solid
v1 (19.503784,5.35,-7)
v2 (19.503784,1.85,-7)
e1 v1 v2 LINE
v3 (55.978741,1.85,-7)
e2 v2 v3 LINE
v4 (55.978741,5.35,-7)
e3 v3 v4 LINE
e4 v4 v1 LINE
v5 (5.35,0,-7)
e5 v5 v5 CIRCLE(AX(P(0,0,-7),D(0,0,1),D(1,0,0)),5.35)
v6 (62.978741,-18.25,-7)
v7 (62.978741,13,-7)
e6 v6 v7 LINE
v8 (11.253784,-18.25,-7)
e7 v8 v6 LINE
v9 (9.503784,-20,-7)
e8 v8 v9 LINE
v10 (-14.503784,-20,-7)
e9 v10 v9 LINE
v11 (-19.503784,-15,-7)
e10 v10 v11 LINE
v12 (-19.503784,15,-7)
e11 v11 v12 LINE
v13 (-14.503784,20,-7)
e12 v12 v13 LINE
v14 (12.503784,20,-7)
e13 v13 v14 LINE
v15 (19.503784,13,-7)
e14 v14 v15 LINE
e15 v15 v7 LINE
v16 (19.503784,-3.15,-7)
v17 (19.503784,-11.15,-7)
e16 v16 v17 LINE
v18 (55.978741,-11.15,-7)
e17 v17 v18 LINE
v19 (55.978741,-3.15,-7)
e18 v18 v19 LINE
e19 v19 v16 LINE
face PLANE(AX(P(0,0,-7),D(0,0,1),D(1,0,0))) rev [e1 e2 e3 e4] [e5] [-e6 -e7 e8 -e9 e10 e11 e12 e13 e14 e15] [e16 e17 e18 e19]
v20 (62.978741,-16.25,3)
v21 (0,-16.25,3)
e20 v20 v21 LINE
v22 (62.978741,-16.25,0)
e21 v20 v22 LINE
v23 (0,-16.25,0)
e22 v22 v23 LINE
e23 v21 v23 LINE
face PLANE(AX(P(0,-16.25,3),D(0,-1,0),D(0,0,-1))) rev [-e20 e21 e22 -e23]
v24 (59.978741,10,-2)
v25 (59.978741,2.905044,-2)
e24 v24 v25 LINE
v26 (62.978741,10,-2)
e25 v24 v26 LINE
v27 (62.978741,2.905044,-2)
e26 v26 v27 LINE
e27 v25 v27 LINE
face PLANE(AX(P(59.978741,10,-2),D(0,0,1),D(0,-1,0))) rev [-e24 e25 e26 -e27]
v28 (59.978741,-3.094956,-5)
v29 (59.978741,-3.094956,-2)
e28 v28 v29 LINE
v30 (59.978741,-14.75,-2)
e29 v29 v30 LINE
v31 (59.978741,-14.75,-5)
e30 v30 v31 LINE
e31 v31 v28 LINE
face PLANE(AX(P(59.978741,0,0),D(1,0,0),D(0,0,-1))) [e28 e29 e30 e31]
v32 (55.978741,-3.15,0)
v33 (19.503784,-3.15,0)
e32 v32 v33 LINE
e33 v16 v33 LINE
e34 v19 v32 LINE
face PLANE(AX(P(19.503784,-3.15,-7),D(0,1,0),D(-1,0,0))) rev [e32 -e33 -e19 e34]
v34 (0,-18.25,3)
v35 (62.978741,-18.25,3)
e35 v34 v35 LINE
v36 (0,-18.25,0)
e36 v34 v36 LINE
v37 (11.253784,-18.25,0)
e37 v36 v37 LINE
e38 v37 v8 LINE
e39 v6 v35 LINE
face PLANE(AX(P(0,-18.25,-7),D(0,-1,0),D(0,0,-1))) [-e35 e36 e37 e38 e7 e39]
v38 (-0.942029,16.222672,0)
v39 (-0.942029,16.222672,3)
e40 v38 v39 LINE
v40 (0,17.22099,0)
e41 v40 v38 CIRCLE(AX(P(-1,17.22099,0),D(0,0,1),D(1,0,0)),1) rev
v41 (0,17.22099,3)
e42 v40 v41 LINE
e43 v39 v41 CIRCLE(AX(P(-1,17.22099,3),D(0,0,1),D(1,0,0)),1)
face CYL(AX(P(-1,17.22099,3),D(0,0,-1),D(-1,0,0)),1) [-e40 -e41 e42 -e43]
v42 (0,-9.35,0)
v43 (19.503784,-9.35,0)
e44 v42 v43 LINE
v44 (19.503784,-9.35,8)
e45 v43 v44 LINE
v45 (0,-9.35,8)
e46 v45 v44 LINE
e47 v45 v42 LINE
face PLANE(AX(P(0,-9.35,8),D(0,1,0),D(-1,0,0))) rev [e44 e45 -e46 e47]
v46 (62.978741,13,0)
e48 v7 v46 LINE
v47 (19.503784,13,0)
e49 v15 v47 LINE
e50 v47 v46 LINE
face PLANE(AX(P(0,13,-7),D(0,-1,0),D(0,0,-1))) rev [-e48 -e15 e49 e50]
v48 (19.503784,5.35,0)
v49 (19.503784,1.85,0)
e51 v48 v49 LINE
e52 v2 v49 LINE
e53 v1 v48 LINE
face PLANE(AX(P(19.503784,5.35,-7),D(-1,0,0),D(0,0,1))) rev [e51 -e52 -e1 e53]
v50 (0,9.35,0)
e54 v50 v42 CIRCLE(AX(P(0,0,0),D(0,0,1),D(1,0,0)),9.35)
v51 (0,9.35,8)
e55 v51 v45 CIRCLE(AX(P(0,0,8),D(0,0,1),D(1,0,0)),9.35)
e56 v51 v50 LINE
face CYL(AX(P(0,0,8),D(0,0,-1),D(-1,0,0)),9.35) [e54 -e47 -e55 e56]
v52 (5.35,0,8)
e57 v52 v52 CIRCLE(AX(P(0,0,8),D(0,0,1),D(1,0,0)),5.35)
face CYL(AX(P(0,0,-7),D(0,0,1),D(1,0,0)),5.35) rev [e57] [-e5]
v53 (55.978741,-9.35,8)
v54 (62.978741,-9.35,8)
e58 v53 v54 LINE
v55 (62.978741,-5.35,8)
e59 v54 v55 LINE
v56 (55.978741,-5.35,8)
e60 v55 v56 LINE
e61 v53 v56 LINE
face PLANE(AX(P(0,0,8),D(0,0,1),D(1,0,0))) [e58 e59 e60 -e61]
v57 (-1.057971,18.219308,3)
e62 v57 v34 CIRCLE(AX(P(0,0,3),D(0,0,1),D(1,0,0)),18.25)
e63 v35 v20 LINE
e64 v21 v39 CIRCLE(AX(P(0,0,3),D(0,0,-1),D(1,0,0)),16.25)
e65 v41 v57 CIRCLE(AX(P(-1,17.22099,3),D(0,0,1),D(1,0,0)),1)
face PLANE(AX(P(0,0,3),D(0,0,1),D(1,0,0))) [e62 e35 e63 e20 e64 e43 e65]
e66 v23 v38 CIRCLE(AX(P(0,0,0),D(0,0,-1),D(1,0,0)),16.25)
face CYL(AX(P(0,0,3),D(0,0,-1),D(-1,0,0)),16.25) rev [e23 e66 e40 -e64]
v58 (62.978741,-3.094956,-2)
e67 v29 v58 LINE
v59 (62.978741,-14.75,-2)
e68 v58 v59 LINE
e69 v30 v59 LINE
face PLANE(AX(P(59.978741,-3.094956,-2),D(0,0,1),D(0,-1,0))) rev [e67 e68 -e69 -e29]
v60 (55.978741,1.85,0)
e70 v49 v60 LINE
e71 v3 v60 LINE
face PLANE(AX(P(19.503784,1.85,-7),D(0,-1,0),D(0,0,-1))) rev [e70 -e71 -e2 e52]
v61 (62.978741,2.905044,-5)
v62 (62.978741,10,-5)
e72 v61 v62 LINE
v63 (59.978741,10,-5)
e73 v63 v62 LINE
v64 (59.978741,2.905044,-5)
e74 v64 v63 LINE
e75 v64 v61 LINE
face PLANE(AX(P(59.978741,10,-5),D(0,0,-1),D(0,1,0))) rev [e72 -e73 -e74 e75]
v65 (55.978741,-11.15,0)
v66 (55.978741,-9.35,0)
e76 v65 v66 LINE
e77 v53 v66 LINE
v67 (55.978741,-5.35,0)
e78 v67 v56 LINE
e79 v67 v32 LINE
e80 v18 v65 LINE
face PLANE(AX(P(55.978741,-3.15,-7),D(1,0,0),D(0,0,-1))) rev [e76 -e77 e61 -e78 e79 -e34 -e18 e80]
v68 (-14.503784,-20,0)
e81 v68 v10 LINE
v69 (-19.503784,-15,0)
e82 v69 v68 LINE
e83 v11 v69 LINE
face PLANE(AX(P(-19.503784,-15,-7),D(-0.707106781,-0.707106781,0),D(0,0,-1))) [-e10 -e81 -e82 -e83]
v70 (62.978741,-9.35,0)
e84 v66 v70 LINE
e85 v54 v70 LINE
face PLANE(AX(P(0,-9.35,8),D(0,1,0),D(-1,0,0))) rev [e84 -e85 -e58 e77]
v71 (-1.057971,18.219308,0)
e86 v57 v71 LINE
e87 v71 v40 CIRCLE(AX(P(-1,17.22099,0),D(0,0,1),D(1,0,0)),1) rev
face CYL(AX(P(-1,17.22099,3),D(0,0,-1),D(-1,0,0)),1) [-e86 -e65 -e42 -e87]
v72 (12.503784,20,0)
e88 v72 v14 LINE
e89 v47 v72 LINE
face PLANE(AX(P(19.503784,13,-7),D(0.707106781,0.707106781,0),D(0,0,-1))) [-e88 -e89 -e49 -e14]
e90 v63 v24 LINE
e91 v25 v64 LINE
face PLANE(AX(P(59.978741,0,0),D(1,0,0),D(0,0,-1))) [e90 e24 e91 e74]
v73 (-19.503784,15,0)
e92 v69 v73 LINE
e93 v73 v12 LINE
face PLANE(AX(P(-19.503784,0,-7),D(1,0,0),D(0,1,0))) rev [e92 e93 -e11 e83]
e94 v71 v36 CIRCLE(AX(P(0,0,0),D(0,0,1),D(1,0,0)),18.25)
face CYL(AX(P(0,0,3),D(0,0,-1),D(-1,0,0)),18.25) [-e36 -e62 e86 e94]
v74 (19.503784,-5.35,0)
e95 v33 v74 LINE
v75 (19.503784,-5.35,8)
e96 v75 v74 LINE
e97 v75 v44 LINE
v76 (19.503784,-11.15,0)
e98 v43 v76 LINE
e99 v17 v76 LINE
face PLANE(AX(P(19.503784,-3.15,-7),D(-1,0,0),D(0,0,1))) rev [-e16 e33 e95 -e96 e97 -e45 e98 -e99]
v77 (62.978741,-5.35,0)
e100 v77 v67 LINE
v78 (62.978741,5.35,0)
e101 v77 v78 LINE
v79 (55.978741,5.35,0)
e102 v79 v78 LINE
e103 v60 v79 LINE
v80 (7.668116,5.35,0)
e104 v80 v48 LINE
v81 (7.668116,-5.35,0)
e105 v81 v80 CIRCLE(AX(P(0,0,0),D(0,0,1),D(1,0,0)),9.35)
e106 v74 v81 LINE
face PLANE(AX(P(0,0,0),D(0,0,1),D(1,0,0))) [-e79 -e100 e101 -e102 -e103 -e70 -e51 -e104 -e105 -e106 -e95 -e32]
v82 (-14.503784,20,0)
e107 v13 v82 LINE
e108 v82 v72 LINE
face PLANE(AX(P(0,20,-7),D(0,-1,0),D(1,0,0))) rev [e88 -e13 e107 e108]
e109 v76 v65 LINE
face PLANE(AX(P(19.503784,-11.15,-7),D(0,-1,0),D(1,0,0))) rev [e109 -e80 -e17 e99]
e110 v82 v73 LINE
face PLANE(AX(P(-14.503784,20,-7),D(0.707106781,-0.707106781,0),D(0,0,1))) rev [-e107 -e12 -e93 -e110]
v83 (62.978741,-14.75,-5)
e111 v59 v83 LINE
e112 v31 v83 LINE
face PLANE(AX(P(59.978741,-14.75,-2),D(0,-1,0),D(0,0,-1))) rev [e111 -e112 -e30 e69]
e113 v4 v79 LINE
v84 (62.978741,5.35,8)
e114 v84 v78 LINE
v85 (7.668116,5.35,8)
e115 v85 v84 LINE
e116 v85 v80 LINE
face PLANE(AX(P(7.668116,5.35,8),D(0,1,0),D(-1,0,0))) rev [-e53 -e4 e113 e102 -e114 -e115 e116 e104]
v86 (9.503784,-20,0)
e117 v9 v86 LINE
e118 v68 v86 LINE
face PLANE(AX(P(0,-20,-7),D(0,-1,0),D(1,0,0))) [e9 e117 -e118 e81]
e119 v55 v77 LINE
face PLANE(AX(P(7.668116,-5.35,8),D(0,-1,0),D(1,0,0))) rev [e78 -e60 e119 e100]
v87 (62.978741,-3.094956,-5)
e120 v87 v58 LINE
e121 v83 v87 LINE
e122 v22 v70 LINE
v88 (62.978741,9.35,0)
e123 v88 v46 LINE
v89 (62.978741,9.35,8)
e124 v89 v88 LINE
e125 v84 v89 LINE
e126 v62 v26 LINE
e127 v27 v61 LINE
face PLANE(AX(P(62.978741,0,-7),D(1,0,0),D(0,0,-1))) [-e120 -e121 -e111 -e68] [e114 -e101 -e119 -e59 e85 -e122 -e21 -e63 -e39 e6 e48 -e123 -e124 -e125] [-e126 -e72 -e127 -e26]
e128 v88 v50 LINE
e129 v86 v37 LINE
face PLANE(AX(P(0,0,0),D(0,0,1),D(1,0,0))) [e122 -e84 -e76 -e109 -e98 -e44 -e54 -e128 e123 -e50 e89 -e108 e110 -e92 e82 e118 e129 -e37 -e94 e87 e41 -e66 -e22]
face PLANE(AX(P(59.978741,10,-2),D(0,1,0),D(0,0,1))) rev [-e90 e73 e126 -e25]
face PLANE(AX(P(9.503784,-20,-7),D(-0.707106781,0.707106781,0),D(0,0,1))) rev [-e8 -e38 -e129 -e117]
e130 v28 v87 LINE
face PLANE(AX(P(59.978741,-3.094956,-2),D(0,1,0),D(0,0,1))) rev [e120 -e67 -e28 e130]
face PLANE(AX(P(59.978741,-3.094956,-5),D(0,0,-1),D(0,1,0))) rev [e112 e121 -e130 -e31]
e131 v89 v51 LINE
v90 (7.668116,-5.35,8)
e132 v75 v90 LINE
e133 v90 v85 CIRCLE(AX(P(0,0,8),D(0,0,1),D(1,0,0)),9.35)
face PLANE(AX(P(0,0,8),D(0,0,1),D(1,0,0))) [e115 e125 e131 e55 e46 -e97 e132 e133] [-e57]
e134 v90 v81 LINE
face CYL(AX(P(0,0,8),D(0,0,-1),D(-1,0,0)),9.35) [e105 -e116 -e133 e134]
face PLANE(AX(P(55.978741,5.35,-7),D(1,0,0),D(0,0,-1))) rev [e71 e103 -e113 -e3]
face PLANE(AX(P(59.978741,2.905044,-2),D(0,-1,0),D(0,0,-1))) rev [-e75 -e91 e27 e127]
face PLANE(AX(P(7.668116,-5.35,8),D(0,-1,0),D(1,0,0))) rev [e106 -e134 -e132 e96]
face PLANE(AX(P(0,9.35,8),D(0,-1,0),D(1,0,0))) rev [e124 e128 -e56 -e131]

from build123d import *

# Parameters (mm, degrees)
SKETCH1_R               = 5.35
BOSS_EXTRUDE2_DEPTH     = 7
BOSS_EXTRUDE3_START     = 8
SKETCH3_R               = 5.35
BOSS_EXTRUDE3_DEPTH     = 8
BOSS_EXTRUDE4_DEPTH     = 3
FILLET1_R               = 1
CHAMFER1_SIZE           = 10
CHAMFER2_SIZE           = 5
CUT_EXTRUDE1_DEPTH      = 67.560662475
CUT_EXTRUDE1_DEPTH_BACK = 67.560662475
SKETCH5_W               = 36.474956737
SKETCH5_H               = 3.5
SKETCH5_H_2             = 8
CHAMFER3_SIZE           = 7
SKETCH6_W               = 3
SKETCH6_H               = 7.094956055
SKETCH6_H_2             = 11.655043945
CUT_EXTRUDE2_DEPTH      = 3


# Some blends are built 0.0001 mm under size
with BuildPart() as part:
    # Sketch1 → Boss-Extrude2 (new body)
    with BuildSketch(Plane.XY):
        Polygon((-19.503784034, -20), (19.503784034, -20), (19.503784034, -18.25), (62.978740771, -18.25), (62.978740771, 13), (19.503784034, 13), (19.503784034, 20), (-19.503784034, 20), align=None)
        Circle(SKETCH1_R, mode=Mode.SUBTRACT)
    extrude(amount=-BOSS_EXTRUDE2_DEPTH)

    # Sketch3 → Boss-Extrude3 (add)
    with BuildSketch(Plane.XY.offset(BOSS_EXTRUDE3_START)):
        with BuildLine():
            Line((7.668115805, 5.35), (62.978740771, 5.35))
            Line((62.978740771, 5.35), (62.978740771, 9.35))
            Line((62.978740771, 9.35), (0, 9.35))
            ThreePointArc((0, 9.35), (-9.35, 0), (0, -9.35))
            Line((0, -9.35), (62.978740771, -9.35))
            Line((62.978740771, -9.35), (62.978740771, -5.35))
            Line((62.978740771, -5.35), (7.668115805, -5.35))
            ThreePointArc((7.668115805, -5.35), (9.35, 0), (7.668115805, 5.35))
        make_face()
        Circle(SKETCH3_R, mode=Mode.SUBTRACT)
    extrude(amount=-BOSS_EXTRUDE3_DEPTH)

    # Sketch4 → Boss-Extrude4 (add)
    with BuildSketch(Plane.XY):
        with BuildLine():
            Line((0, -18.25), (62.978740771, -18.25))
            Line((62.978740771, -18.25), (62.978740771, -16.25))
            Line((62.978740771, -16.25), (8.306623863, -16.25))
            Line((8.306623863, -16.25), (0, -16.25))
            ThreePointArc((0, -16.25), (-16.25, 0), (0, 16.25))
            Line((0, 16.25), (0, 18.25))
            ThreePointArc((0, 18.25), (-18.25, 0), (0, -18.25))
        make_face()
    extrude(amount=BOSS_EXTRUDE4_DEPTH)

    # Fillet1
    fillet1_edges = [part.edges().sort_by_distance(p)[0] for p in [
        (0, 16.25, 1.5),
        (0, 18.25, 1.5),
    ]]
    fillet(fillet1_edges, radius=FILLET1_R - 0.0001)  # a hair under: the kernel refuses the full size

    # Chamfer1
    # the kernel refuses this chamfer: 10 mm, written as the material it takes off along each edge
    with BuildSketch(Plane(origin=(19.503784034, -20, 25.71682988), x_dir=(0.027495876610586317, 0.9996219169112968, 0), z_dir=(0, 0, -1))) as chamfer1_piece_1_section:
        Polygon((CHAMFER1_SIZE * 0.999621916911, -CHAMFER1_SIZE * 0.0274958766106), (-CHAMFER1_SIZE * 0.0274958766106, -CHAMFER1_SIZE * 0.999621916911), (0, 0), align=None)
    chamfer1_piece_1 = extrude(amount=58.433659759, mode=Mode.PRIVATE)
    chamfer1_piece_1 = split(chamfer1_piece_1, bisect_by=Plane(origin=(14.814200223, -18.25, -3.5), z_dir=(0, -1, 0)), keep=Keep.TOP, mode=Mode.PRIVATE)
    add(chamfer1_piece_1, mode=Mode.SUBTRACT)

    # Chamfer2
    chamfer2_edges = [part.edges().sort_by_distance(p)[0] for p in [
        (-19.503784034, -20, -3.5),
        (-19.503784034, 20, -3.5),
    ]]
    chamfer(chamfer2_edges, length=CHAMFER2_SIZE)

    # Sketch5 → Cut-Extrude1 (cut, two sides: drawn at the far end of the back side and taken through both)
    with BuildSketch(Plane.XY.offset(-CUT_EXTRUDE1_DEPTH_BACK)):
        with Locations((37.741262403, 3.6)):
            Rectangle(SKETCH5_W, SKETCH5_H)
        with Locations((37.741262403, -7.15)):
            Rectangle(SKETCH5_W, SKETCH5_H_2)
    extrude(amount=CUT_EXTRUDE1_DEPTH + CUT_EXTRUDE1_DEPTH_BACK, mode=Mode.SUBTRACT)

    # Chamfer3
    chamfer3_edges = [part.edges().sort_by_distance(p)[0] for p in [
        (19.503784034, 20, -3.5),
    ]]
    chamfer(chamfer3_edges, length=CHAMFER3_SIZE - 0.0001)  # a hair under: the kernel refuses the full size

    # Sketch6 → Cut-Extrude2 (cut)
    with BuildSketch(Plane(origin=(62.978740771, 0, 0), x_dir=(0, 0, -1), z_dir=(1, 0, 0))):
        with Locations((3.5, 6.452521972)):
            Rectangle(SKETCH6_W, SKETCH6_H)
        with Locations((3.5, -8.922478028)):
            Rectangle(SKETCH6_W, SKETCH6_H_2)
    extrude(amount=-CUT_EXTRUDE2_DEPTH, mode=Mode.SUBTRACT)


solid = part.part
